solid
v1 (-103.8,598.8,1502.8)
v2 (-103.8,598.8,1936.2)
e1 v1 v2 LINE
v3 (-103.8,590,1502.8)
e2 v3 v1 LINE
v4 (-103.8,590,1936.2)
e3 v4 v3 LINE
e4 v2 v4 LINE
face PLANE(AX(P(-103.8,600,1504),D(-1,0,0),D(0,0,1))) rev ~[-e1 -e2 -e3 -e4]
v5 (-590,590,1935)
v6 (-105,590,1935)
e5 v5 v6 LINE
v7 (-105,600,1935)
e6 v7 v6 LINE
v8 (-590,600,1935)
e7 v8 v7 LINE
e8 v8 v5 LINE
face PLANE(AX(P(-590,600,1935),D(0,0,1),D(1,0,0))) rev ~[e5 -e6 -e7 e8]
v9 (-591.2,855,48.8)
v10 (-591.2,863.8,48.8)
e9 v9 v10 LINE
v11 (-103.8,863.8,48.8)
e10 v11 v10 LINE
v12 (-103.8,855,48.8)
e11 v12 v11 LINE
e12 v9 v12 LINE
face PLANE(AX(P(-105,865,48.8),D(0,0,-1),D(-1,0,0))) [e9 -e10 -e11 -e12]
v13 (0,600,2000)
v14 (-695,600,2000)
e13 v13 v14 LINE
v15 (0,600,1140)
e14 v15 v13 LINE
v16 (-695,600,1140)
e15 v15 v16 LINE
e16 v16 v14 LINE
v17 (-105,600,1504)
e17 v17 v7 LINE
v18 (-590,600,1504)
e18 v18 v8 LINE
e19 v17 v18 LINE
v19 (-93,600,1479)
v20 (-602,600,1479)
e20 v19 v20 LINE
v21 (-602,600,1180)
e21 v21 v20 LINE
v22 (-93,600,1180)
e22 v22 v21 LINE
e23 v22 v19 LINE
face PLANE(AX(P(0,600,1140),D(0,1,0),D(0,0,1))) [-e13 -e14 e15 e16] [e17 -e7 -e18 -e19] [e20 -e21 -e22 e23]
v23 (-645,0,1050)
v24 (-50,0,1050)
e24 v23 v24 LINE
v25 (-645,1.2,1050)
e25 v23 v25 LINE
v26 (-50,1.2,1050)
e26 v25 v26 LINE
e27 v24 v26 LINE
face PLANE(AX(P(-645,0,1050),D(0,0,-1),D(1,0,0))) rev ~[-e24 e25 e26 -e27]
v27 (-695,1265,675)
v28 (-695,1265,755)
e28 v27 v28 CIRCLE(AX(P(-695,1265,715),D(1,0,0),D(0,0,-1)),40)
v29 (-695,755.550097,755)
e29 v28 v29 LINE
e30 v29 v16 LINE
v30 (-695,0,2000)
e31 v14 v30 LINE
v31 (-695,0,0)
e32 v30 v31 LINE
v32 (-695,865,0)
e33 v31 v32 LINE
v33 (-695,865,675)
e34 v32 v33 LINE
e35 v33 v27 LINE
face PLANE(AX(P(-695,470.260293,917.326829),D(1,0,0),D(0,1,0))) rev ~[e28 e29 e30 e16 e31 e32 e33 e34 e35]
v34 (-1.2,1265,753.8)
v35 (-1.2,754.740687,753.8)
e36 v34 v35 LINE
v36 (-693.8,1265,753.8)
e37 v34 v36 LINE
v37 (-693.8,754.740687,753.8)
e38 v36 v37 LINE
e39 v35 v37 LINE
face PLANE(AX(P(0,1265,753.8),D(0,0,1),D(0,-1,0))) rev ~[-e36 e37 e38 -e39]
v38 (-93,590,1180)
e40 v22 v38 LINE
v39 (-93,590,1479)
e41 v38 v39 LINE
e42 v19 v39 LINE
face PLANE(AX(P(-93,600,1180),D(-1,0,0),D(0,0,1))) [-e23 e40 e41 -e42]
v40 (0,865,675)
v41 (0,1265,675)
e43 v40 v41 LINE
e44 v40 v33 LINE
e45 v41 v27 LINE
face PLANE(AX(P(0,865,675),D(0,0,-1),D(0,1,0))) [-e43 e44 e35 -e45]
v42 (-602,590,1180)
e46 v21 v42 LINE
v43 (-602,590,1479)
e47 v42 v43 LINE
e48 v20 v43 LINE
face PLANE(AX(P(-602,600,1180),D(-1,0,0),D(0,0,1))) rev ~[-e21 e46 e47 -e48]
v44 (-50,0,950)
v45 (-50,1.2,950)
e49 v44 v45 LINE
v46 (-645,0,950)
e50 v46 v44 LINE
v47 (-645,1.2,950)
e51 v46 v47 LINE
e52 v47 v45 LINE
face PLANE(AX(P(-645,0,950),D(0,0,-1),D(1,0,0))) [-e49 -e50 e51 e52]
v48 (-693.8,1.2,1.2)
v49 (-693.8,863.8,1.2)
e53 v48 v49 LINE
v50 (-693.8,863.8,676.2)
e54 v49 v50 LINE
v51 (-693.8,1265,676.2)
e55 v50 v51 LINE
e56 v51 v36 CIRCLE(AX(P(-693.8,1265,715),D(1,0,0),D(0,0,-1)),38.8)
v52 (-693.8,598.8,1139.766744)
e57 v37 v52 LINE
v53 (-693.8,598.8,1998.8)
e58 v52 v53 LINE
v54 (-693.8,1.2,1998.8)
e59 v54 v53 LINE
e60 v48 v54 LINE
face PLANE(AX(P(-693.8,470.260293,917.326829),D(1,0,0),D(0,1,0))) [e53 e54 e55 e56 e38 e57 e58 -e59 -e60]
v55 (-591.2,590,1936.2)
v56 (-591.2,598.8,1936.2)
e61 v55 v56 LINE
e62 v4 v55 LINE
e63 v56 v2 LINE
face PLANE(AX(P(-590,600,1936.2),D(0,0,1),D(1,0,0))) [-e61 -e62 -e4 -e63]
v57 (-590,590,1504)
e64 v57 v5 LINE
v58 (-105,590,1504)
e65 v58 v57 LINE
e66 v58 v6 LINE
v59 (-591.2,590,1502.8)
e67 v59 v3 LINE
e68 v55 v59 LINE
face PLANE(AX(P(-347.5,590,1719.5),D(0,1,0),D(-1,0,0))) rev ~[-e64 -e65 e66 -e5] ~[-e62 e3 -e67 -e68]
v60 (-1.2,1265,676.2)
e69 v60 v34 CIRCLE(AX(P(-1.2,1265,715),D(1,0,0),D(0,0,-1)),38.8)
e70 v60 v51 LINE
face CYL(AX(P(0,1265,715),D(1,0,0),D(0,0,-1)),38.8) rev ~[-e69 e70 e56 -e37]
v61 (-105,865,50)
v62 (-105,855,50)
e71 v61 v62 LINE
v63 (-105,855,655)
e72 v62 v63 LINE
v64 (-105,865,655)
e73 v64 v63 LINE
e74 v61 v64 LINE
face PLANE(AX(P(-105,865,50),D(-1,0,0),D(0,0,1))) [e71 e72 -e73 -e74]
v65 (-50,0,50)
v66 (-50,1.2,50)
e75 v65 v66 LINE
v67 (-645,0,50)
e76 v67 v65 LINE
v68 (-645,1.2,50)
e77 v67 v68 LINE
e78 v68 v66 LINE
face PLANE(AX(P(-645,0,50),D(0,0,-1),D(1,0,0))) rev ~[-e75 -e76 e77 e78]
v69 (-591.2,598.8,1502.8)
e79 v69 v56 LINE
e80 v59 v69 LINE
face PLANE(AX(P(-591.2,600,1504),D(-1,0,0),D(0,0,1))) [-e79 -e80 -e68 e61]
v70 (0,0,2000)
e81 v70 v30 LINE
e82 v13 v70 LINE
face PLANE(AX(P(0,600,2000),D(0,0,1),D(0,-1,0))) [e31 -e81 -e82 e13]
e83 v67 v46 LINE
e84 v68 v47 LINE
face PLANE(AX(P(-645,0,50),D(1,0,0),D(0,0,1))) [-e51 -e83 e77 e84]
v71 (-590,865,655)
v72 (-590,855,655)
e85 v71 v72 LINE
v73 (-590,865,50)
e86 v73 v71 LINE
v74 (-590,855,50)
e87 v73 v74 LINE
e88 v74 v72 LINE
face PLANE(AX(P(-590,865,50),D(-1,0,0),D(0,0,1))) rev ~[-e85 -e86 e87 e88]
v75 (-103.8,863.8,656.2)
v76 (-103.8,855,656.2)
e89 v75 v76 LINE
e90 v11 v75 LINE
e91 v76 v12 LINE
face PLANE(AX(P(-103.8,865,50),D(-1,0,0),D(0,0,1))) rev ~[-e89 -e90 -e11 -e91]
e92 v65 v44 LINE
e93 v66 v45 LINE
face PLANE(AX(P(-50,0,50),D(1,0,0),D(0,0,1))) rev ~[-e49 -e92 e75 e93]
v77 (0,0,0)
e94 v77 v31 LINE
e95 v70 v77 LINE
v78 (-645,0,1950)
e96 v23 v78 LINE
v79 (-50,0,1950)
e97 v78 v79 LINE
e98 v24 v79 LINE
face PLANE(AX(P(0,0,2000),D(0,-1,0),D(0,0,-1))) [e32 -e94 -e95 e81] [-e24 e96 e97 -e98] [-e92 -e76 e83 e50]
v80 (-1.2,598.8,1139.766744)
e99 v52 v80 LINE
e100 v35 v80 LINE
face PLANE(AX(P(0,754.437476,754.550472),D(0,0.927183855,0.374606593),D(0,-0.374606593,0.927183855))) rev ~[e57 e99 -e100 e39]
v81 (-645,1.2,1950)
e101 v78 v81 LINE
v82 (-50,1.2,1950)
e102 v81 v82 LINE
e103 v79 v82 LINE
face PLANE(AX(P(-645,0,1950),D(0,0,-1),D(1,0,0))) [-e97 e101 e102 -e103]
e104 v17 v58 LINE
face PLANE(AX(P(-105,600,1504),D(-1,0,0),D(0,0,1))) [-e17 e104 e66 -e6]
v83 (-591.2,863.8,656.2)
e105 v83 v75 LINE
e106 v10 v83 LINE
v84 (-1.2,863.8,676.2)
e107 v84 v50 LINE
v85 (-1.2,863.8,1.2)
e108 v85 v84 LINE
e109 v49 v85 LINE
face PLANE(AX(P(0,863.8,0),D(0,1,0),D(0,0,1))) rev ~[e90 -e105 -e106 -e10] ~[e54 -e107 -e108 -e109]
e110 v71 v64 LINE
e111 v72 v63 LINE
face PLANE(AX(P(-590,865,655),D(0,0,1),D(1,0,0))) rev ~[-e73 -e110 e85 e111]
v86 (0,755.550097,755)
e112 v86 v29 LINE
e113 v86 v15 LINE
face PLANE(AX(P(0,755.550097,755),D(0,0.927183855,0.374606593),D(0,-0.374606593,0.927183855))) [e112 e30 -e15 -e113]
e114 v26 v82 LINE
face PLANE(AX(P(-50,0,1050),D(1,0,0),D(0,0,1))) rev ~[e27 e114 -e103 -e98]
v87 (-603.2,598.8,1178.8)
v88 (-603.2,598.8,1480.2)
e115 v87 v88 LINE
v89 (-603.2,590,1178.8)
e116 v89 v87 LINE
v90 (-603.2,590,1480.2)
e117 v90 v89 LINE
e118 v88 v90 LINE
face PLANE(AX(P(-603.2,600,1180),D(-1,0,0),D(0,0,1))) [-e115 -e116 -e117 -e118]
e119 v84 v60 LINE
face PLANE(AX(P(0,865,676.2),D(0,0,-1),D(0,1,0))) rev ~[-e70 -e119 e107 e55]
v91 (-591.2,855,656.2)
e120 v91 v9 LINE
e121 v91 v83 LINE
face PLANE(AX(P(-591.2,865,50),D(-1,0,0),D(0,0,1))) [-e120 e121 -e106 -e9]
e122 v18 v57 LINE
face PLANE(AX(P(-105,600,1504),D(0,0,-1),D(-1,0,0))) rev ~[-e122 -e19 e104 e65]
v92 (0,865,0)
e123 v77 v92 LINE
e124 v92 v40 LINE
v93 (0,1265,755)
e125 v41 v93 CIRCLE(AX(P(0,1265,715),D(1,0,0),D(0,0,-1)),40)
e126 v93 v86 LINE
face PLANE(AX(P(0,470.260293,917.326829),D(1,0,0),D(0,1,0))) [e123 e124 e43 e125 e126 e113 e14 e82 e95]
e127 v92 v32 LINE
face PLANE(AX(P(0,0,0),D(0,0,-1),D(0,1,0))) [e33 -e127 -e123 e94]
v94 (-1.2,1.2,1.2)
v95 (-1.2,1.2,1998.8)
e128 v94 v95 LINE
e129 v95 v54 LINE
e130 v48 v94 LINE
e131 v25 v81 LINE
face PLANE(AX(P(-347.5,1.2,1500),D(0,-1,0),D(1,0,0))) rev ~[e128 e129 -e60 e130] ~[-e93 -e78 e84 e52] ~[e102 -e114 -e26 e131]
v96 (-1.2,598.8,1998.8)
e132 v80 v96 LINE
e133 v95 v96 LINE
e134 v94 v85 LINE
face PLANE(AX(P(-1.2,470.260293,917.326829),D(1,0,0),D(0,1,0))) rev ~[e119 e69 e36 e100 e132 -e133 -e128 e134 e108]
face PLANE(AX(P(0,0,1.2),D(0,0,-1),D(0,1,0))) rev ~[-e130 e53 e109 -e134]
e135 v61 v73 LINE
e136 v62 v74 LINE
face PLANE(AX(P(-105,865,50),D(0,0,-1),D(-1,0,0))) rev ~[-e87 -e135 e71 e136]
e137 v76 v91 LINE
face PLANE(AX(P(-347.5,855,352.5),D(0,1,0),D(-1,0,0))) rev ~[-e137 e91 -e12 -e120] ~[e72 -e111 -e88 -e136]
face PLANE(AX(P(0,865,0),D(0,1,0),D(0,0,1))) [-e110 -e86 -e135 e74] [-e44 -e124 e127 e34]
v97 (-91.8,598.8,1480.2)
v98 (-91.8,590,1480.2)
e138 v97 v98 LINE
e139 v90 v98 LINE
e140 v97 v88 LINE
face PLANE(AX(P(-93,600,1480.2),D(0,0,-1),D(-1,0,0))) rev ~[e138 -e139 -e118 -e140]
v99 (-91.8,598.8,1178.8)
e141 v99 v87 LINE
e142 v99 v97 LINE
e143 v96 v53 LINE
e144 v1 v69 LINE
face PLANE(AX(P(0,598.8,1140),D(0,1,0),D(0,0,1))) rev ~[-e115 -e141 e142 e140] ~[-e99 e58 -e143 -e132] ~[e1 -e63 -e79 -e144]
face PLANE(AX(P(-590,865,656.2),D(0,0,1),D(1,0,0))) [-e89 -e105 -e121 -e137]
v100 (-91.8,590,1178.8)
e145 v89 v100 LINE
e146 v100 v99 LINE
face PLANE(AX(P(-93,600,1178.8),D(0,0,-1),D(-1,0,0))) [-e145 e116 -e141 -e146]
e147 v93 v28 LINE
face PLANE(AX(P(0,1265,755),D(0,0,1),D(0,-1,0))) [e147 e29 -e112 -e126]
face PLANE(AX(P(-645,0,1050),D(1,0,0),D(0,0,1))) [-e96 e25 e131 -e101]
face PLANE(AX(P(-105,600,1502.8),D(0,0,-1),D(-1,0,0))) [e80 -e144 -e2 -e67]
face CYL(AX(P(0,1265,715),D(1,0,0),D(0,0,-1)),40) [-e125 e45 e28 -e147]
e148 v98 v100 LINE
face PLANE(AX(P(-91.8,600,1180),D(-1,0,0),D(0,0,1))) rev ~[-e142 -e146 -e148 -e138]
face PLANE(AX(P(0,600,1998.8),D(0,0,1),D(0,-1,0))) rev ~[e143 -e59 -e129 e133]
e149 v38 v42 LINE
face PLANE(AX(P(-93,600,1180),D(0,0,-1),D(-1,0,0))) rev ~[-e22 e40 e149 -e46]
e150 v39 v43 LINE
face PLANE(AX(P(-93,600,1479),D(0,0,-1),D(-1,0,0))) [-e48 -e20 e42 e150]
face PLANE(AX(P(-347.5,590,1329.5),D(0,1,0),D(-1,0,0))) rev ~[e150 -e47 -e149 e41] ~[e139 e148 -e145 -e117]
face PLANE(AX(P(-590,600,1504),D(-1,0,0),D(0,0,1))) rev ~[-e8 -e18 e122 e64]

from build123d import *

# Parameters (mm, degrees)
F1_DEPTH = 695
F2_W     = 595
F2_H     = 900
F3_DEPTH = 1.2
F4_W     = 509
F4_H     = 299
F5_DEPTH = 10
F4_W_2   = 465
F4_H_2   = 431
F4_W_3   = 10
F6_DEPTH = 10
F7_W     = 465
F7_H     = 605
F7_W_2   = 10
F8_DEPTH = 10
F9_T     = -1.2


# Not quite as in the source:
# - a shell that OpenCascade refuses in one call is made with other operations: the cavity is built on its own and cut out


with BuildPart() as f1:
    # F0 (on Right) → F1 (new body)
    with BuildSketch(Plane.YZ):
        with BuildLine():
            Line((0, 2000), (0, 0))
            Line((0, 0), (865, 0))
            Line((865, 0), (865, 675))
            Line((865, 675), (1265, 675))
            ThreePointArc((1265, 675), (1305, 715), (1265, 755))
            Line((1265, 755), (755.5500969465, 755))
            Line((755.5500969465, 755), (600, 1140))
            Line((600, 1140), (600, 2000))
            Line((600, 2000), (0, 2000))
        make_face()
    extrude(amount=-F1_DEPTH)

    # F2 (on face) → F3 (cut)
    with BuildSketch(Plane.XZ):
        with Locations((-347.5, 1500)):
            Rectangle(F2_W, F2_H)
        with Locations((-347.5, 500)):
            Rectangle(F2_W, F2_H)
    extrude(amount=-F3_DEPTH, mode=Mode.SUBTRACT)

    # F4 (on face) → F5 (cut)
    with BuildSketch(Plane(origin=(0, 600, 0), x_dir=(-1, 0, 0), z_dir=(0, 1, 0))):
        with Locations((347.5, 1329.5)):
            Rectangle(F4_W, F4_H)
    extrude(amount=-F5_DEPTH, mode=Mode.SUBTRACT)

    # F4 (on face) → F6 (cut)
    with BuildSketch(Plane(origin=(0, 600, 0), x_dir=(-1, 0, 0), z_dir=(0, 1, 0))):
        with Locations((347.5, 1719.5)):
            Rectangle(F4_W_2, F4_H_2)
        with Locations((110, 1719.5)):
            Rectangle(F4_W_3, F4_H_2)
        with Locations((585, 1719.5)):
            Rectangle(F4_W_3, F4_H_2)
    extrude(amount=-F6_DEPTH, mode=Mode.SUBTRACT)

    # F7 (on face) → F8 (cut)
    with BuildSketch(Plane(origin=(0, 865, 0), x_dir=(-1, 0, 0), z_dir=(0, 1, 0))):
        with Locations((347.5, 352.5)):
            Rectangle(F7_W, F7_H)
        with Locations((110, 352.5)):
            Rectangle(F7_W_2, F7_H)
        with Locations((585, 352.5)):
            Rectangle(F7_W_2, F7_H)
    extrude(amount=-F8_DEPTH, mode=Mode.SUBTRACT)

    # F9: a shell. OpenCascade refuses it in one call, so the cavity is built on its own and cut out:
    # the body offset inwards by the wall thickness, plus a prism from it out through each open face.
    f9_core = offset(f1.part, amount=F9_T, kind=Kind.INTERSECTION, mode=Mode.PRIVATE)
    f9_exits = [f9_core.faces().sort_by_distance(p)[0] for p in [
        (-347.5, 588.8, 1719.5),
        (-347.5, 588.8, 1329.5),
        (-347.5, 853.8, 352.5),
        (-347.5, 2.4, 500),
        (-347.5, 2.4, 1500),
    ]]
    add(f9_core, mode=Mode.SUBTRACT)
    extrude(f9_exits, amount=-F9_T, mode=Mode.SUBTRACT)


solid = f1.part
